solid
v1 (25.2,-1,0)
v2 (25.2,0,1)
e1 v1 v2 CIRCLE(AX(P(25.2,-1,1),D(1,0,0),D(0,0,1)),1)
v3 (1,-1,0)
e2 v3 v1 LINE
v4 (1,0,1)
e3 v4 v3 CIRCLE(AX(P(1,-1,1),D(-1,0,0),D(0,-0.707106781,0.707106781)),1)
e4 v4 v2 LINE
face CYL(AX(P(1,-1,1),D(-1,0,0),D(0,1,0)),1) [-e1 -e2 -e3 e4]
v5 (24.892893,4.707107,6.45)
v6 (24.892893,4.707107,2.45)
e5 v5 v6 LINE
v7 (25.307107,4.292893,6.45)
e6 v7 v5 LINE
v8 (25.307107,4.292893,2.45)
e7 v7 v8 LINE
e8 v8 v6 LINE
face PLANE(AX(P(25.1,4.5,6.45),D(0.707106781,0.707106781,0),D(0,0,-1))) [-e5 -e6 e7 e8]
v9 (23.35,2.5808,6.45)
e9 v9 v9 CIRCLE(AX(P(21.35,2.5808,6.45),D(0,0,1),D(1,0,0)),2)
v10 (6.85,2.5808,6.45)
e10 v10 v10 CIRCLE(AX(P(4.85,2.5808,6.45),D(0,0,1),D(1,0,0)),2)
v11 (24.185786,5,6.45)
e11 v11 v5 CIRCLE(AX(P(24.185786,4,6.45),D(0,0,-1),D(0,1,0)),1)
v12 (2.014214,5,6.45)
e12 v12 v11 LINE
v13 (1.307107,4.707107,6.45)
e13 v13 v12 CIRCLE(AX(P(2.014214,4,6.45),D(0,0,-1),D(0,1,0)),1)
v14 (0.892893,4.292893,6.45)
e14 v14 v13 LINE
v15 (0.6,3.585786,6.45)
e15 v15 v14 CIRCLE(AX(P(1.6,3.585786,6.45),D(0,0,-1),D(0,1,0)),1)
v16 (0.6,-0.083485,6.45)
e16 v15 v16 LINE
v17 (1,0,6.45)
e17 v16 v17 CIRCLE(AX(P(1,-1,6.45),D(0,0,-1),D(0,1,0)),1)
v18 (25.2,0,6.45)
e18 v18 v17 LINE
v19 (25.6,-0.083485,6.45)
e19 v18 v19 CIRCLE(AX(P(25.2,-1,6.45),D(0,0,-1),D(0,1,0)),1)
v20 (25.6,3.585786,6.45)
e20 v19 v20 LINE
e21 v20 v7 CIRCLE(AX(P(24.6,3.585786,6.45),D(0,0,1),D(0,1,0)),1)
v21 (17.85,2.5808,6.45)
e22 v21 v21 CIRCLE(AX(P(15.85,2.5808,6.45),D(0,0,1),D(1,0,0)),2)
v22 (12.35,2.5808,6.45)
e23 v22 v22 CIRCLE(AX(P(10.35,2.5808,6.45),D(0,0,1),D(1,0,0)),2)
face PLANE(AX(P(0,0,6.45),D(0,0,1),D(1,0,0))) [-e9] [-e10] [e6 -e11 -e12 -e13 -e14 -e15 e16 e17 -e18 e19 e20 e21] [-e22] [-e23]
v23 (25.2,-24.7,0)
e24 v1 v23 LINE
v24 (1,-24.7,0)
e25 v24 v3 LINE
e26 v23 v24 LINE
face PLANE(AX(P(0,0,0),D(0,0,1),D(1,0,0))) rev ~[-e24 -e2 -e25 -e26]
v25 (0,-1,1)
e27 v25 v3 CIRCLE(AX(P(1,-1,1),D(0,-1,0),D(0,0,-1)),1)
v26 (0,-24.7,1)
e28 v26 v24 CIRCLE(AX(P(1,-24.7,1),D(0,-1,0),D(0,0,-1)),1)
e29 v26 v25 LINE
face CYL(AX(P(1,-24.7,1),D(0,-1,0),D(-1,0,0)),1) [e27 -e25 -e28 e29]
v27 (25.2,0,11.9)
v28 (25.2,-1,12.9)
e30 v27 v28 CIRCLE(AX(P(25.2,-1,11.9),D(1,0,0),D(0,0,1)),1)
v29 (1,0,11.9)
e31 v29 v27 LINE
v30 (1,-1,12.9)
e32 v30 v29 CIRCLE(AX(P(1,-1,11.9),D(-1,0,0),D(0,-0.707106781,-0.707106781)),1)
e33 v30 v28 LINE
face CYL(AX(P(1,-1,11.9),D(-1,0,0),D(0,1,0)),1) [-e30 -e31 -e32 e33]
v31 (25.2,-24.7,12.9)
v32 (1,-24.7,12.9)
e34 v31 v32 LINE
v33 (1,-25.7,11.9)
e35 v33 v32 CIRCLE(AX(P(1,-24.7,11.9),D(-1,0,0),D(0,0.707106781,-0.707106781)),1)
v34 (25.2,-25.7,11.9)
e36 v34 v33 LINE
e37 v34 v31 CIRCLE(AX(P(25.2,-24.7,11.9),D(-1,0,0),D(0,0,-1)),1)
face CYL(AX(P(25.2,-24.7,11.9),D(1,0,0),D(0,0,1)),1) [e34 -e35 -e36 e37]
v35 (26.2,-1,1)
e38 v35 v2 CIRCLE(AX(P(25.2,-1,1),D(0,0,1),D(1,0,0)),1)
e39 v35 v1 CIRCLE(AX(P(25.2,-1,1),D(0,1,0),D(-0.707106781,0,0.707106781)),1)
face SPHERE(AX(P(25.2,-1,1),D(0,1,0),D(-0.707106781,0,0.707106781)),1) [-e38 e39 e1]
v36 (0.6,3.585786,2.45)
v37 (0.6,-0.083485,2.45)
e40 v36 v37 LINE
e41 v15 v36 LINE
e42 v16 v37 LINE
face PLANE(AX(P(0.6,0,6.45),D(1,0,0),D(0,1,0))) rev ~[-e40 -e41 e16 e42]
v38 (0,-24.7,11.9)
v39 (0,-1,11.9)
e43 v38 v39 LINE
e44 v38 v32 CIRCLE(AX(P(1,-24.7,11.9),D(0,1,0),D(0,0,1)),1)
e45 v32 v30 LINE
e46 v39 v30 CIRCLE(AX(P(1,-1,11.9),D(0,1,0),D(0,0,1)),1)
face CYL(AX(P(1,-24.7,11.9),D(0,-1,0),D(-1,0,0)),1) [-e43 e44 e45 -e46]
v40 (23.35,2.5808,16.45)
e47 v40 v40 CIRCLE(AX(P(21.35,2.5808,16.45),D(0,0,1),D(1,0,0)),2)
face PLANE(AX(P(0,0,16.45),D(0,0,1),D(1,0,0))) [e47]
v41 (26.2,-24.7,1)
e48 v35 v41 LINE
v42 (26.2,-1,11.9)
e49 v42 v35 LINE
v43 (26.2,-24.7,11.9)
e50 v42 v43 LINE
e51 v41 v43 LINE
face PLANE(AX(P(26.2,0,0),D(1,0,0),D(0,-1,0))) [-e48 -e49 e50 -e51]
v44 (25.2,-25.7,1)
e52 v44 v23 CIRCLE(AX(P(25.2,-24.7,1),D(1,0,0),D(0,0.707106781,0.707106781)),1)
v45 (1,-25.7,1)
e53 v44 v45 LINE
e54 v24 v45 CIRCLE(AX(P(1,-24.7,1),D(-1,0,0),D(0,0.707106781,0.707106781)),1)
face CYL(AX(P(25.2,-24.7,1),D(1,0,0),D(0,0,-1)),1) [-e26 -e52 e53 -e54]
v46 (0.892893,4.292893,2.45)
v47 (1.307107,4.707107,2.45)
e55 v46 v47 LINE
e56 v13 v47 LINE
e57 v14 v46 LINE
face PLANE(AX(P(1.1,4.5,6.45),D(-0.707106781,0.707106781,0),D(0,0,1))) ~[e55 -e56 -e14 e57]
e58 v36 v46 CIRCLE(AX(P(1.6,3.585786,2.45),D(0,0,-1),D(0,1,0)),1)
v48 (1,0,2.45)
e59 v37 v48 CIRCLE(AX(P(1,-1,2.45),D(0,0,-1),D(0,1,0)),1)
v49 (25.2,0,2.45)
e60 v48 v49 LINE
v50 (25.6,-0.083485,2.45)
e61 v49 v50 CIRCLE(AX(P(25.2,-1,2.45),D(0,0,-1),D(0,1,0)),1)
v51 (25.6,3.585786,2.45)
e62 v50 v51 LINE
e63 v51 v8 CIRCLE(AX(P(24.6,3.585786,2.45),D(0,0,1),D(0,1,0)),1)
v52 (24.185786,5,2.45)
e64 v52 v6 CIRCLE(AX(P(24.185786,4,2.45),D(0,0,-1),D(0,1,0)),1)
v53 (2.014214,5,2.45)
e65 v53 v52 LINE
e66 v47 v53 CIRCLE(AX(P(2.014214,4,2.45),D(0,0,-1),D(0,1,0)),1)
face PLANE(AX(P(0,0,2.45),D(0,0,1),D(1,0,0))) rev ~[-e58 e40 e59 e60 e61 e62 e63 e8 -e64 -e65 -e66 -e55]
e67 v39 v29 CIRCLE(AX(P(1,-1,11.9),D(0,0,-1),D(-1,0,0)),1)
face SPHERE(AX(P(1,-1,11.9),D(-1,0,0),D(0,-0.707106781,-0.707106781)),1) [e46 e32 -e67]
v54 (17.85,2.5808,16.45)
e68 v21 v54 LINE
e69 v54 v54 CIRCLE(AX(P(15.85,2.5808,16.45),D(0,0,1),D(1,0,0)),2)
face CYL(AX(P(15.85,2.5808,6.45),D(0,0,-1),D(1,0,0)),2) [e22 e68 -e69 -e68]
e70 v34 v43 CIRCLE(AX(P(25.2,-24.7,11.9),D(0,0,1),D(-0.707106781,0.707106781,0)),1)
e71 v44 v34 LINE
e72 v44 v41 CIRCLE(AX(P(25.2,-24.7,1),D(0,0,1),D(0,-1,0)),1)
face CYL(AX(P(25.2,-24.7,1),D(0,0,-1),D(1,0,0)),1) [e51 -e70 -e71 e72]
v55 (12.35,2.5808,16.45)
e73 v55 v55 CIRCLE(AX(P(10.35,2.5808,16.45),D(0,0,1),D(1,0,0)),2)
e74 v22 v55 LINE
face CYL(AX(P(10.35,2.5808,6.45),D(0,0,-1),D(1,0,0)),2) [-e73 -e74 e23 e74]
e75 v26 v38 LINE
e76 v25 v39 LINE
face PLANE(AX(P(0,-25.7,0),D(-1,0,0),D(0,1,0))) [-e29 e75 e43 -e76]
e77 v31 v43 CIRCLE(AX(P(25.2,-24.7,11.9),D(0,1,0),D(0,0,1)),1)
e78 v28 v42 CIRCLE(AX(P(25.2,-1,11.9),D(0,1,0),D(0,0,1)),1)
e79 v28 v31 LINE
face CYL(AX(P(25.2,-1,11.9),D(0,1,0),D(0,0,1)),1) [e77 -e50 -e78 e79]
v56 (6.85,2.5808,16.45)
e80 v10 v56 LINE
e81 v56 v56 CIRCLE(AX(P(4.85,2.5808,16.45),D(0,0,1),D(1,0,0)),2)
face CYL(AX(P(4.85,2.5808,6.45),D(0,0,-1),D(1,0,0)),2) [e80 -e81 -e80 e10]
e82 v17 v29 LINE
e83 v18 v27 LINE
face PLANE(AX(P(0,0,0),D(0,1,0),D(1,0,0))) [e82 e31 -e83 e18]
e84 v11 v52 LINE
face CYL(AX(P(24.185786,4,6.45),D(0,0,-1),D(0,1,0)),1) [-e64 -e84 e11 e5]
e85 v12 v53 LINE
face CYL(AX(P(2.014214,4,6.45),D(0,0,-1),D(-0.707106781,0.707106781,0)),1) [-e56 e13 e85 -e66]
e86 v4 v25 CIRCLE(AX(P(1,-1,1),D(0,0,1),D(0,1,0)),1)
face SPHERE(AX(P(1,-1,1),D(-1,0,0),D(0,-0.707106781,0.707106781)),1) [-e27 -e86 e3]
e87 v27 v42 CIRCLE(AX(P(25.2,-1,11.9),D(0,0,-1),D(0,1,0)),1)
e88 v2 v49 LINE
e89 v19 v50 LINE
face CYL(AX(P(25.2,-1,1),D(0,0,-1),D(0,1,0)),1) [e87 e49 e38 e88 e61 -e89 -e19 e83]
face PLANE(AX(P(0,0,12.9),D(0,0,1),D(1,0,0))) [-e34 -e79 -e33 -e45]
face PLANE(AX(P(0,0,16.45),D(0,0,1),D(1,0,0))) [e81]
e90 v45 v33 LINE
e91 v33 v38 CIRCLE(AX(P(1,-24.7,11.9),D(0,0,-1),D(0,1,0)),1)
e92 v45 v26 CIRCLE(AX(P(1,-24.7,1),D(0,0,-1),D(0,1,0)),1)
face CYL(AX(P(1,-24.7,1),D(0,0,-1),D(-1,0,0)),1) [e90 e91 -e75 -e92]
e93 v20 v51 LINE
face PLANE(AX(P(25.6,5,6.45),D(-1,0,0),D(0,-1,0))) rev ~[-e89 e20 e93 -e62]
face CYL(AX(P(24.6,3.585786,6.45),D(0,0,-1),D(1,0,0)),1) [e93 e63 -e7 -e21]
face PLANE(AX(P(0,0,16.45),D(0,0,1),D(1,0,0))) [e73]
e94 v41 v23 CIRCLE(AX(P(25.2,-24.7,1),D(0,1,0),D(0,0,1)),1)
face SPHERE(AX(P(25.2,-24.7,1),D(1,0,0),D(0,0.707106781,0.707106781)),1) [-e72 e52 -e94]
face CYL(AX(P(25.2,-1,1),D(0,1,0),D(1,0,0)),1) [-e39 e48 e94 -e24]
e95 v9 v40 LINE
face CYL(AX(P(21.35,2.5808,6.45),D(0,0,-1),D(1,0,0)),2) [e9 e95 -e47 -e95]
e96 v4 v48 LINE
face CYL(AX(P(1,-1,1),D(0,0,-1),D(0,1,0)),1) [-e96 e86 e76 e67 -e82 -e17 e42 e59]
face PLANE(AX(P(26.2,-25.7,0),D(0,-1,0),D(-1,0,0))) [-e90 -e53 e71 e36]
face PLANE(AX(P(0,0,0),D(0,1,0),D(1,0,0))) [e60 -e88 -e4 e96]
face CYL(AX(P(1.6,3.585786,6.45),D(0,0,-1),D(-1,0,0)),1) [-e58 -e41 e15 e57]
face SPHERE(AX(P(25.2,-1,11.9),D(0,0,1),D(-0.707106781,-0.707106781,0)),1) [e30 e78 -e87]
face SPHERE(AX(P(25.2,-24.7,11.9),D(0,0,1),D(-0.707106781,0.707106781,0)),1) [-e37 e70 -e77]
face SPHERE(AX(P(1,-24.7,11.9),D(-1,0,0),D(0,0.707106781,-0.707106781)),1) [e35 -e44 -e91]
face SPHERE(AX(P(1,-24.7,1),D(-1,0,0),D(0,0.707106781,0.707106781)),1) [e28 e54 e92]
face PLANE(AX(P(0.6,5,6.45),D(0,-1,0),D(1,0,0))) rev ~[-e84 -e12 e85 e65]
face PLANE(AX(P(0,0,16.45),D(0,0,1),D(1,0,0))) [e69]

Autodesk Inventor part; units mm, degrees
ref_plane "YZ Plane" through (0, 0, 0) normal (1, 0, 0) x (0, 1, 0)
ref_plane "XZ Plane" through (0, 0, 0) normal (0, 1, 0) x (-1, 0, 0)
sketch "スケッチ1" plane through (0, 0, 0) normal (0, 0, 1) x (1, 0, 0)
  line L0 (0, 0) -> (26.2, 0)
  line L1 (26.2, 0) -> (26.2, -25.7)
  line L2 (26.2, -25.7) -> (0, -25.7)
  line L3 (0, -25.7) -> (0, 0)
  dimension "d0" = 25.7
  dimension "d1" = 26.2
extrude "外形" add sketch "スケッチ1" along normal blind 12.9
ref_plane "作業平面1" through (0, 0, 6.45) normal (0, 0, 1) x (1, 0, 0)
sketch "スケッチ2" plane through (0, 0, 6.45) normal (0, 0, 1) x (1, 0, 0)
  line L0 (0, 0) -> (26.2, 0) projected
  line L1 (0, 0) -> (26.2, 0) projected
  line L2 (0.6, 0) -> (0.6, 5)
  line L3 (0.6, 5) -> (25.6, 5)
  line L4 (25.6, 5) -> (25.6, 0)
  line L5 (13.1, 0) -> (13.1, 3.4882)
  dimension "d5" = 5
  dimension "d6" = 25
extrude "突起部" add sketch "スケッチ2" against normal blind 4
chamfer "面取り1" distance 1 angle 45 2 edges at (0.6, 5, 4.45) (25.6, 5, 4.45)
fillet "フィレット1" radius 1 12 edges at (0, 0, 6.45) (0, -25.7, 6.45) (26.2, -25.7, 6.45) (13.1, -25.7, 12.9) (26.2, -12.85, 12.9) (26.2, -12.85, 0) (0, -12.85, 12.9) (13.1, 0, 12.9) (13.1, 0, 0) (13.1, -25.7, 0) (26.2, 0, 6.45) (0, -12.85, 0)
fillet "フィレット2" radius 1 4 edges at (25.6, 4, 4.45) (24.6, 5, 4.45) (1.6, 5, 4.45) (0.6, 4, 4.45)
sketch "スケッチ3" plane through (0, 0, 6.45) normal (0, 0, 1) x (1, 0, 0)
  arc A0 (2.0142, 5) -> (1.3071, 4.7071) centre (2.0142, 4) ccw projected
  line L0 (0.6, 4) -> (1.3071, 4.7071) projected
  line L1 (0.6, 4) -> (0.6, -0.0835) projected
  arc A1 (1, 0) -> (0.6, -0.0835) centre (1, -1) ccw projected
  line L2 (25.2, 0) -> (1, 0) projected
  arc A2 (25.6, -0.0835) -> (25.2, 0) centre (25.2, -1) ccw projected
  line L3 (25.6, -0.0835) -> (25.6, 3.5858) projected
  arc A3 (25.6, 3.5858) -> (25.3071, 4.2929) centre (24.6, 3.5858) ccw projected
  line L4 (24.8929, 4.7071) -> (25.3071, 4.2929) projected
  arc A4 (24.8929, 4.7071) -> (24.1858, 5) centre (24.1858, 4) ccw projected
  line L5 (24.1858, 5) -> (2.0142, 5) projected
  line L6 (4.85, 2.5808) -> (21.35, 2.5808)
  line L7 (13.1, 5) -> (13.1, 0.3828)
  point P0 (0, 0)
  point P1 (10.35, 2.5808)
  point P2 (15.85, 2.5808)
  dimension "d14" = 5.5
  dimension "d15" = 16.5
sketch "スケッチ4" plane through (0, 0, 6.45) normal (0, 0, 1) x (1, 0, 0)
  circle A0 centre (4.85, 2.5808) radius 2
  circle A1 centre (10.35, 2.5808) radius 2
  circle A2 centre (15.85, 2.5808) radius 2
  circle A3 centre (21.35, 2.5808) radius 2
  point P0 (0, 0)
  dimension "d16" = 4
  dimension "d17" = 4
  dimension "d18" = 4
  dimension "d19" = 4
extrude "押し出し3" add sketch "スケッチ4" along normal blind 10
equation "\"d14\" = 0.333333 * d15"
properties part number "MC402CR" material "ABS Plastic"
